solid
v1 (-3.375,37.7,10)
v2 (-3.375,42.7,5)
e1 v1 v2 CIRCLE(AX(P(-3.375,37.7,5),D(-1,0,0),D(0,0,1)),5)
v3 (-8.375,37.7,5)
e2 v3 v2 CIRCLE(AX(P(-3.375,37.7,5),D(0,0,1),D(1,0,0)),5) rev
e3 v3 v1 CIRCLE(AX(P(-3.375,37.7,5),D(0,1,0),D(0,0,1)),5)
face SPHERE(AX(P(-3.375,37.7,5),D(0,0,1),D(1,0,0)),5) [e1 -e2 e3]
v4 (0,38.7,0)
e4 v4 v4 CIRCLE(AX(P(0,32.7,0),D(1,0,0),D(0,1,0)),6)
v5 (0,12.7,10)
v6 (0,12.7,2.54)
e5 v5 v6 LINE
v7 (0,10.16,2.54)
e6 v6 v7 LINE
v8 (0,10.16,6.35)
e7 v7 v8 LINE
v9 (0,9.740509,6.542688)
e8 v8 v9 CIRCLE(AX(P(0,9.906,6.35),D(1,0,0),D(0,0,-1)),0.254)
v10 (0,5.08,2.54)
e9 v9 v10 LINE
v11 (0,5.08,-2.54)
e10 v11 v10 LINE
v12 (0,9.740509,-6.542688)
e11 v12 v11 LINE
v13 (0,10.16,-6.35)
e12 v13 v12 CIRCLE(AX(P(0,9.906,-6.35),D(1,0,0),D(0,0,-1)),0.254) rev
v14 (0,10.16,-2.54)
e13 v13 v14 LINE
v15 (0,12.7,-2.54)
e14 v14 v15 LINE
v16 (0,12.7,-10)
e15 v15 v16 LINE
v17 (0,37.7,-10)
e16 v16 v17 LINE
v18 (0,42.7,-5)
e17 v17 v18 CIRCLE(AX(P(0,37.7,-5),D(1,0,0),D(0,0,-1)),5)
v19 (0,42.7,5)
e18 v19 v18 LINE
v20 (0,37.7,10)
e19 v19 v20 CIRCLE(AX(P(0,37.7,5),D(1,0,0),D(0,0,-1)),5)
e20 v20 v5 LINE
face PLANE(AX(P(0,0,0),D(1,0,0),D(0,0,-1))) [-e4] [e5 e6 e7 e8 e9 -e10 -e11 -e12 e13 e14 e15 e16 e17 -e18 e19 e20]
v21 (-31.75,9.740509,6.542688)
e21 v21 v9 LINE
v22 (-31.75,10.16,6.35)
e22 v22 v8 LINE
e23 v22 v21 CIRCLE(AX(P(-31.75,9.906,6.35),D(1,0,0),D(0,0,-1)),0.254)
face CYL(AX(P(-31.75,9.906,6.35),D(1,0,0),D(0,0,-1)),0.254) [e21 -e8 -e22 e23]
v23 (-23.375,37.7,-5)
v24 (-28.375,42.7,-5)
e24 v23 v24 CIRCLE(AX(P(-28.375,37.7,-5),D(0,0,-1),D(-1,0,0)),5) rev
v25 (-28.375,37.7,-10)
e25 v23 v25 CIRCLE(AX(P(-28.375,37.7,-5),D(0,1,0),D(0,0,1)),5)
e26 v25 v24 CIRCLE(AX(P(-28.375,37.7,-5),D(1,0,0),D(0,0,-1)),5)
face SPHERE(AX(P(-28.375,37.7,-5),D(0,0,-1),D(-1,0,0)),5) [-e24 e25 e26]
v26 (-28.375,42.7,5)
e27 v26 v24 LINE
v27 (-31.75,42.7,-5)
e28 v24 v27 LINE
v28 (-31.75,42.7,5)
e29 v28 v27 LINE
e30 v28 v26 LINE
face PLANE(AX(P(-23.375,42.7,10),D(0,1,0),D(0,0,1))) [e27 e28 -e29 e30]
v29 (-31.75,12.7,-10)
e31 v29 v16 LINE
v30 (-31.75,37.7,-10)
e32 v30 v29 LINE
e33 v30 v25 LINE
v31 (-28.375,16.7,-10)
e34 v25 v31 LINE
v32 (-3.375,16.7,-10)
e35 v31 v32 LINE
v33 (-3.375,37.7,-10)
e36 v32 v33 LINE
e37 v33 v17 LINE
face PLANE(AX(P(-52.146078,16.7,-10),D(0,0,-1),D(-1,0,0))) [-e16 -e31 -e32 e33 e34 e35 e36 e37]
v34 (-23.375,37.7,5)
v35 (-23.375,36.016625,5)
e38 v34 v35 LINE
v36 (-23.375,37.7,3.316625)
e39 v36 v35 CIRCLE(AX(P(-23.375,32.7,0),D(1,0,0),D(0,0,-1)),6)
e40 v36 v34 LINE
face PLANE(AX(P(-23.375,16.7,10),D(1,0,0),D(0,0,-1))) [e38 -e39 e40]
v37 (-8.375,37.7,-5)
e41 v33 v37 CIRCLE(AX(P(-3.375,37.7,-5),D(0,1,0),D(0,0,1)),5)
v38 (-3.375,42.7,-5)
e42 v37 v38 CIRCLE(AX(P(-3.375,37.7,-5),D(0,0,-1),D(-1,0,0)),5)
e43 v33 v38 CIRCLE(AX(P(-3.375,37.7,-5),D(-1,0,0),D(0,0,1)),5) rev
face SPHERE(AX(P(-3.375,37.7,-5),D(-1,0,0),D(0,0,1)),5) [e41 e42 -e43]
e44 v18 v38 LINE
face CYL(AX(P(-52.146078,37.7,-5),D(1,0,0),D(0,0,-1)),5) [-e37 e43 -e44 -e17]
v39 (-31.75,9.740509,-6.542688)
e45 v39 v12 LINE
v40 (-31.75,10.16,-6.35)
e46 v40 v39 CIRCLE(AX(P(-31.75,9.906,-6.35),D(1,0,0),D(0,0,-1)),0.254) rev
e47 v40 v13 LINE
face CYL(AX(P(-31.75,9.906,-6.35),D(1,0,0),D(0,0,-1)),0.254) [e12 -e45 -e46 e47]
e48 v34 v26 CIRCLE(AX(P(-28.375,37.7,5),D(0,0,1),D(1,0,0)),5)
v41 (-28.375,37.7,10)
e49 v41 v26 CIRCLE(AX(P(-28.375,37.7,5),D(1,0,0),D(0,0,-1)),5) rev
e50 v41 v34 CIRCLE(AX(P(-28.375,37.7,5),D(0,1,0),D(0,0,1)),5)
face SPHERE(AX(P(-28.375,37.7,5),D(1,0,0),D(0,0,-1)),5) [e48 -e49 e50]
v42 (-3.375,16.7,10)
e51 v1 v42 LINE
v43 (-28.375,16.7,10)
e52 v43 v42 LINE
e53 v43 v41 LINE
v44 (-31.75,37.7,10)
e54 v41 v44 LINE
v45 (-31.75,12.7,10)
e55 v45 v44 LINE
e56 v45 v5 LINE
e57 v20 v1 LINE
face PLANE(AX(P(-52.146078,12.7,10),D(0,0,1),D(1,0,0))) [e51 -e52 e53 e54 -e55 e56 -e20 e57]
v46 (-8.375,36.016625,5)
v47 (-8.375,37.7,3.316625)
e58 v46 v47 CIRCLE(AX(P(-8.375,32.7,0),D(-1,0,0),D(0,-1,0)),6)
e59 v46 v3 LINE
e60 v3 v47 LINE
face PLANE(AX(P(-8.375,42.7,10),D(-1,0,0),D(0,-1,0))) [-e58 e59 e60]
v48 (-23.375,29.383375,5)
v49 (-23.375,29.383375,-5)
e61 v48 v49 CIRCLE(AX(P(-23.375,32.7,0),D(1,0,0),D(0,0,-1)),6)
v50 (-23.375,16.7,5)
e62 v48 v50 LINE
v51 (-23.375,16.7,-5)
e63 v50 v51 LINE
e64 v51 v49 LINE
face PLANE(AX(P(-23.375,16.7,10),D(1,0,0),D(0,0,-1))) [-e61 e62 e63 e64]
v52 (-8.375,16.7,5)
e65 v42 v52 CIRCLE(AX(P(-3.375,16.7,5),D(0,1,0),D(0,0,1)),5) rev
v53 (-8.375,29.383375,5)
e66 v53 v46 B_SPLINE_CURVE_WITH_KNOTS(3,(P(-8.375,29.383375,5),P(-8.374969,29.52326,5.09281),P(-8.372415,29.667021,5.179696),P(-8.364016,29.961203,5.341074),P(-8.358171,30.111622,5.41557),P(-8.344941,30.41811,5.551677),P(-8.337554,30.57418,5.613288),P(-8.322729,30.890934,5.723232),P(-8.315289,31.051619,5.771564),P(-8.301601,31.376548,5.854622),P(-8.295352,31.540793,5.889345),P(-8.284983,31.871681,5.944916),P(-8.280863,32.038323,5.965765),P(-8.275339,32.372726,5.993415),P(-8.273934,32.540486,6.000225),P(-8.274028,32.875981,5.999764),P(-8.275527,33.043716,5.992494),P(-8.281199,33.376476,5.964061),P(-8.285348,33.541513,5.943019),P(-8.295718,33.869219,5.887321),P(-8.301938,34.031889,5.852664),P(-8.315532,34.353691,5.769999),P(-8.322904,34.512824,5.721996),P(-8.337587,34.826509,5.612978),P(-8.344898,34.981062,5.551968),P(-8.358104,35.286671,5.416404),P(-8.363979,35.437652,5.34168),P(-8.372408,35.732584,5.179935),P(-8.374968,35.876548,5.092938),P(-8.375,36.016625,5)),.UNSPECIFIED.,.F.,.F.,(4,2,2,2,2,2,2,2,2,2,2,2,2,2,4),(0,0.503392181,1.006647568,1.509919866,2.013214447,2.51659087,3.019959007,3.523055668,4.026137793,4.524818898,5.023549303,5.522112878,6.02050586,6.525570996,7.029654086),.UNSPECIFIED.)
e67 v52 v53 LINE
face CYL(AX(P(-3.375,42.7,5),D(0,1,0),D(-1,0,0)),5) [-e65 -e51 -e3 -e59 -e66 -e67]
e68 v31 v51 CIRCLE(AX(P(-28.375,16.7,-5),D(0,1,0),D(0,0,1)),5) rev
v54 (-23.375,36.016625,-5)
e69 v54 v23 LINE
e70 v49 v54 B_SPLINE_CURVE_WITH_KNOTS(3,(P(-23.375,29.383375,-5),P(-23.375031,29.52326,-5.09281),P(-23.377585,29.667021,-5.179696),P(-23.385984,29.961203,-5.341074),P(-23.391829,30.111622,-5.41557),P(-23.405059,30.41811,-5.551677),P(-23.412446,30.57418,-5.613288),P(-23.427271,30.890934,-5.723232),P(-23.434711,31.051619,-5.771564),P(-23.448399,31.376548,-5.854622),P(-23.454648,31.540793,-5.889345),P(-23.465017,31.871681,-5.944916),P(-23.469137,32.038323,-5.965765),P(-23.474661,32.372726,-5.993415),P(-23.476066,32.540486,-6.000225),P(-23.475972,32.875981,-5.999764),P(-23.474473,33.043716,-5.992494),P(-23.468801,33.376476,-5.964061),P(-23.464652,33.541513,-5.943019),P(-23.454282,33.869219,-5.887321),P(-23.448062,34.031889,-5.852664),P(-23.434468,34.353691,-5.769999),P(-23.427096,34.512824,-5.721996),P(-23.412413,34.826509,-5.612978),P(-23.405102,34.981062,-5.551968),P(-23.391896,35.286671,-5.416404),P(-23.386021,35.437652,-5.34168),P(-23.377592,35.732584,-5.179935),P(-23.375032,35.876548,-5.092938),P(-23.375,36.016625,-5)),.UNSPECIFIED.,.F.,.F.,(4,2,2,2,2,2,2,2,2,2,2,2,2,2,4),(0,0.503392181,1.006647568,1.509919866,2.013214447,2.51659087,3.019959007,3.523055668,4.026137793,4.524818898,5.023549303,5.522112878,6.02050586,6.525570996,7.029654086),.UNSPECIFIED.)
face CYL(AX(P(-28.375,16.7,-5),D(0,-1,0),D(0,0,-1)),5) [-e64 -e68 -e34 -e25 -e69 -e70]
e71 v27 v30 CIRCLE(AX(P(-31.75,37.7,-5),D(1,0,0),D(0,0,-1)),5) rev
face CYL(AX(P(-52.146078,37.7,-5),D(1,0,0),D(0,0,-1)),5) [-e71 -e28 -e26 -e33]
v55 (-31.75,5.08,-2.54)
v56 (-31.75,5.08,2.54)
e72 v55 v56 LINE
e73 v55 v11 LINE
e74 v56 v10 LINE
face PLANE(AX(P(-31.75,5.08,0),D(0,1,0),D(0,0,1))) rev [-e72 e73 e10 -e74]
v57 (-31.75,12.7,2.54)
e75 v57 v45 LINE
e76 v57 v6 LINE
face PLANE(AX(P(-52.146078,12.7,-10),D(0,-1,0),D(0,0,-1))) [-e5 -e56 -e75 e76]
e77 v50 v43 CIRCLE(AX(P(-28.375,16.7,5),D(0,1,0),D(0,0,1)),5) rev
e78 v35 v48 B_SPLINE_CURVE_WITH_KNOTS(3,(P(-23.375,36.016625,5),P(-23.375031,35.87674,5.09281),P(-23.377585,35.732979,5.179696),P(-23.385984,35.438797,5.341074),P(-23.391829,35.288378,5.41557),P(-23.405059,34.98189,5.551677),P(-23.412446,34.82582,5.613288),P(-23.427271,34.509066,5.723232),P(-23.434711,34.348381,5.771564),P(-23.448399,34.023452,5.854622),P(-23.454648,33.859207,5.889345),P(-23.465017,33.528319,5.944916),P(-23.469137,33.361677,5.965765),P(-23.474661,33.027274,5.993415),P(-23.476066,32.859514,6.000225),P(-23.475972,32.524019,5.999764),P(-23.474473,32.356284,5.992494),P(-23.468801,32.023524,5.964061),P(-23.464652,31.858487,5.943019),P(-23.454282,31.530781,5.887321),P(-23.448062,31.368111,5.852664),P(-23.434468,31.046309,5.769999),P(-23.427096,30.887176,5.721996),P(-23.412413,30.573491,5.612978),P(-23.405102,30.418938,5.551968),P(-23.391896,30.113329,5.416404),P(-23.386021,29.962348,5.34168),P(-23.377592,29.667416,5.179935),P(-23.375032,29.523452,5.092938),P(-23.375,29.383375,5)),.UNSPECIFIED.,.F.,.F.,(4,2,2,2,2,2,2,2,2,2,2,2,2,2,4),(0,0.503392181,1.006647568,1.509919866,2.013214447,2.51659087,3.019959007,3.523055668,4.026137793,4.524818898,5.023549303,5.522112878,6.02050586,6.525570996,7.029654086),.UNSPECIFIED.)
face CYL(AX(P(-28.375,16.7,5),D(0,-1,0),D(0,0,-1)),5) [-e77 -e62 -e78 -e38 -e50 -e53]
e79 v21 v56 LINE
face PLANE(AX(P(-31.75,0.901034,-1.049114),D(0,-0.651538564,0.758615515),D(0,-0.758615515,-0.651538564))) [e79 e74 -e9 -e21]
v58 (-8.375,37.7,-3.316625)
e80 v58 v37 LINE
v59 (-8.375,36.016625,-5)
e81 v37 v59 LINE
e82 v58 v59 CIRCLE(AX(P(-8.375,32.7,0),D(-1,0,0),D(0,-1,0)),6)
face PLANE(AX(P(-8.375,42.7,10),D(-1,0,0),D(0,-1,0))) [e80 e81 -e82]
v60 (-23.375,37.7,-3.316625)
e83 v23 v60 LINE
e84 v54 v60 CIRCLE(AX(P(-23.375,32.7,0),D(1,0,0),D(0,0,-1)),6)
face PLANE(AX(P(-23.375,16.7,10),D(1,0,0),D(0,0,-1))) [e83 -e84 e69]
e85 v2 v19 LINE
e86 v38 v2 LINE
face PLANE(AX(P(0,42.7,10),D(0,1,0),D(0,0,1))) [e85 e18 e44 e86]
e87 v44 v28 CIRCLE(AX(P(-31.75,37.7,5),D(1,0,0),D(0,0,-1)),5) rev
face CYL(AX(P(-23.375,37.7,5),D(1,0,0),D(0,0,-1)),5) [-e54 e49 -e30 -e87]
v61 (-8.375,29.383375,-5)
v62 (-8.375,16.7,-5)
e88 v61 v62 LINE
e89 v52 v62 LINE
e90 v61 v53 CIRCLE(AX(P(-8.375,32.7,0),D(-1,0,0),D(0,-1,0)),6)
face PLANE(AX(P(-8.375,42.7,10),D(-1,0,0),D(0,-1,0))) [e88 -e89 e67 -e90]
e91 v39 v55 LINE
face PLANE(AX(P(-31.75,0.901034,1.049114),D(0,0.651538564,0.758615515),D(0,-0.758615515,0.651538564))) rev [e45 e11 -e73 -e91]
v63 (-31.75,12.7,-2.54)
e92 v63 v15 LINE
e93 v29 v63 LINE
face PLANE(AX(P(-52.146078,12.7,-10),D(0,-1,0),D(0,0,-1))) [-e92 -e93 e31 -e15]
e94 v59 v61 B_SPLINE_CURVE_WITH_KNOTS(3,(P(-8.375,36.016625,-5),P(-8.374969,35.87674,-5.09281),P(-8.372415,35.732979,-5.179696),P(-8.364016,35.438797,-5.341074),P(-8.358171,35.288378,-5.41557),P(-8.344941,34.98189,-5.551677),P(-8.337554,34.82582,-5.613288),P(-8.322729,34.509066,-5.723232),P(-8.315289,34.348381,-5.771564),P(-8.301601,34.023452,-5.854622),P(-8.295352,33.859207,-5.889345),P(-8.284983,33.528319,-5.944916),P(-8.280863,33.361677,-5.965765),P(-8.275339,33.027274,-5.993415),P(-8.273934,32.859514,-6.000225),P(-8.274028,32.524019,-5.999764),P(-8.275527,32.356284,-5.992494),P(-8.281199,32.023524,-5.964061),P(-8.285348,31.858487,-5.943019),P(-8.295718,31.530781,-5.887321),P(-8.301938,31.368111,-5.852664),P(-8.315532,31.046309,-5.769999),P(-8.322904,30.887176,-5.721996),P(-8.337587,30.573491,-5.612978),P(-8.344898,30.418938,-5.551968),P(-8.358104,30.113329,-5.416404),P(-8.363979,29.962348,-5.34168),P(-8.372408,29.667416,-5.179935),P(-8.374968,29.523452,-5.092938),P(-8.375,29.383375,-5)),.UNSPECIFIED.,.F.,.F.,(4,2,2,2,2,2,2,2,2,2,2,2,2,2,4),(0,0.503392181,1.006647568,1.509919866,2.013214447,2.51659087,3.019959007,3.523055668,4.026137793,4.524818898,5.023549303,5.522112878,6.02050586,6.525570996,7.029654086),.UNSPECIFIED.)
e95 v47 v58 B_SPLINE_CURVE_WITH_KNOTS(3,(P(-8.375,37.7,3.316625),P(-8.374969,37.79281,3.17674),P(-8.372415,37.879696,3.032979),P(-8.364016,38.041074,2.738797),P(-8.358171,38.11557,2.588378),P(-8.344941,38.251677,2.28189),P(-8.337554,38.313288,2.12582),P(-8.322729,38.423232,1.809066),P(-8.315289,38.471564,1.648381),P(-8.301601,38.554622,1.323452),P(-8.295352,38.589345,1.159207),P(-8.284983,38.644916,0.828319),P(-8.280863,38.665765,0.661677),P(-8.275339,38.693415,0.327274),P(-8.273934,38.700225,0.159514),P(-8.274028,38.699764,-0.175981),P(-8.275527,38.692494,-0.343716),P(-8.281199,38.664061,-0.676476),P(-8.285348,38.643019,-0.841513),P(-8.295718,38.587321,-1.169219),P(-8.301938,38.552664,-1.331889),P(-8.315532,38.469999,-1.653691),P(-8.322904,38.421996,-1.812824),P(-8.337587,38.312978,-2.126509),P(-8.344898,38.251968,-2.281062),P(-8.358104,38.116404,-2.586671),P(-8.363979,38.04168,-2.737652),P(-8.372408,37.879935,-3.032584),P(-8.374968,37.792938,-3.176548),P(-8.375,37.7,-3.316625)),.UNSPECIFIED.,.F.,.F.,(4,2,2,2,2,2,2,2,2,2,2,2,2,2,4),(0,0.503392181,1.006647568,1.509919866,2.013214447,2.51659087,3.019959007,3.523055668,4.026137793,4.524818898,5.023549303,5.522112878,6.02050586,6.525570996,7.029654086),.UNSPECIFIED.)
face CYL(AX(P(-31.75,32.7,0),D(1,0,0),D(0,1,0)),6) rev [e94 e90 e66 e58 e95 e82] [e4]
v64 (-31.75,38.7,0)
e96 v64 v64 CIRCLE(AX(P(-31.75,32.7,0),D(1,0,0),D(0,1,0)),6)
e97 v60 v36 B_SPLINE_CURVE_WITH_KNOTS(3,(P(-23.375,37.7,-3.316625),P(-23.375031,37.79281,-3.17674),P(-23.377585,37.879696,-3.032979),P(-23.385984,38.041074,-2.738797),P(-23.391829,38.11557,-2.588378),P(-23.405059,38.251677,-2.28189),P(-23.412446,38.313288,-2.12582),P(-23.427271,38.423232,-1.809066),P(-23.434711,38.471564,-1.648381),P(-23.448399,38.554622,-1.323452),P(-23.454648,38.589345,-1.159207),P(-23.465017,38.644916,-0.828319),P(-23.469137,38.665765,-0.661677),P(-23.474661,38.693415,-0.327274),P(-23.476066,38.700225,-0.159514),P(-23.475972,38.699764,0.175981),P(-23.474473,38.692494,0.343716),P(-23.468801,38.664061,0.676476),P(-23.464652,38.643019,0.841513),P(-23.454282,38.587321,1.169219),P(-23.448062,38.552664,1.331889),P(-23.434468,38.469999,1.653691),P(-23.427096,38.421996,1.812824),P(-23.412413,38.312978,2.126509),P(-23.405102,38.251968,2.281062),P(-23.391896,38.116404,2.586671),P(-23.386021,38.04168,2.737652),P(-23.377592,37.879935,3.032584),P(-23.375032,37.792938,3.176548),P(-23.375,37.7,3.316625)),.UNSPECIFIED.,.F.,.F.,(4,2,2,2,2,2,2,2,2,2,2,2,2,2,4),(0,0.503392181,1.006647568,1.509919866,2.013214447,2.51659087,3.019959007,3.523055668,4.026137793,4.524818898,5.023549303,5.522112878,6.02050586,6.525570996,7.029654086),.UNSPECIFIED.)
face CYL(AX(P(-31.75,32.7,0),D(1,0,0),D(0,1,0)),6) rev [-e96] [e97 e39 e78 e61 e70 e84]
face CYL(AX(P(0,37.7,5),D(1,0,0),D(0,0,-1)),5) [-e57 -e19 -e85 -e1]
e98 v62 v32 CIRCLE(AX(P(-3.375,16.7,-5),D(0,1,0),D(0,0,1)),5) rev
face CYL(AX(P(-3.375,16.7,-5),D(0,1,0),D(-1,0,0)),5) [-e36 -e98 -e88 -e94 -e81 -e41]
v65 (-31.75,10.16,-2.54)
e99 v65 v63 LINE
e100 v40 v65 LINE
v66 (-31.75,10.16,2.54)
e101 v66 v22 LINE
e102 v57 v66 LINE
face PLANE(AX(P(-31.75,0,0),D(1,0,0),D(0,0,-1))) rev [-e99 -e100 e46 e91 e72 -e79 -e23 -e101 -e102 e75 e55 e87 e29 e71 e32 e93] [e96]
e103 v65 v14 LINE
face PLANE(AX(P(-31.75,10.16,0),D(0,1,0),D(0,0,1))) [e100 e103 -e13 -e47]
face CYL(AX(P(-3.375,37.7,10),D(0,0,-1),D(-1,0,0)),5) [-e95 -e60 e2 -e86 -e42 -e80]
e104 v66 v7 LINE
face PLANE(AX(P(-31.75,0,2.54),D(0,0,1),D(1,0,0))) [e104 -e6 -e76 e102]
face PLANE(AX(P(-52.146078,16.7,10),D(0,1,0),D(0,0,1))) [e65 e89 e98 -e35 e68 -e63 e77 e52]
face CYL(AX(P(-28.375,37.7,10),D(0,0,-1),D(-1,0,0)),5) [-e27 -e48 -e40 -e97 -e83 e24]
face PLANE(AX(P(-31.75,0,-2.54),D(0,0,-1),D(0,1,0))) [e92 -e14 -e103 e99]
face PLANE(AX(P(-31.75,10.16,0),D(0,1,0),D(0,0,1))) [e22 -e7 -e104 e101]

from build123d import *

# Parameters (mm, degrees)
SKETCH10_W              = 2.54
SKETCH10_H              = 5.08
SKETCH10_W_2            = 5.08
SKETCH10_H_2            = 2.54
BOSS_EXTRUDE3_DEPTH     = 31.75
SKETCH11_W              = 20
SKETCH11_H              = 4
BOSS_EXTRUDE4_DEPTH     = 31.75
CUT_EXTRUDE1_DEPTH      = 39.055781427
SKETCH13_W              = 8.375
SKETCH13_H              = 26
BOSS_EXTRUDE5_DEPTH     = 20
CUT_EXTRUDE2_DEPTH      = 50.695881369
CUT_EXTRUDE2_DEPTH_BACK = 50.695881369
SKETCH16_R              = 6
FILLET1_R               = 5


with BuildPart() as part:
    # Sketch10 → Boss-Extrude3 (new body)
    with BuildSketch(Plane(origin=(0, 0, 0), x_dir=(0, 0, -1), z_dir=(1, 0, 0))):
        with Locations((-11.43, 0)):
            Rectangle(SKETCH10_W, SKETCH10_H)
        with BuildLine():
            Line((-5.08, 2.54), (-9.740509205, 6.542688341))
            ThreePointArc((-9.740509205, 6.542688341), (-10.012022021, 6.580814495), (-10.16, 6.35))
            Line((-10.16, 6.35), (-10.16, -6.35))
            ThreePointArc((-10.16, -6.35), (-10.012022021, -6.580814495), (-9.740509205, -6.542688341))
            Line((-9.740509205, -6.542688341), (-5.08, -2.54))
            Line((-5.08, -2.54), (-5.08, 2.54))
        make_face()
        with BuildLine():
            Line((6.35, 10.16), (-6.35, 10.16))
            ThreePointArc((-6.35, 10.16), (-6.580814495, 10.012022021), (-6.542688341, 9.740509205))
            Line((-6.542688341, 9.740509205), (-2.54, 5.08))
            Line((-2.54, 5.08), (2.54, 5.08))
            Line((2.54, 5.08), (6.542688341, 9.740509205))
            ThreePointArc((6.542688341, 9.740509205), (6.580814495, 10.012022021), (6.35, 10.16))
        make_face()
        with Locations((0, 11.43)):
            Rectangle(SKETCH10_W_2, SKETCH10_H_2)
        with BuildLine():
            ThreePointArc((6.542688341, -9.740509205), (6.580814495, -10.012022021), (6.35, -10.16))
            Line((6.35, -10.16), (-6.35, -10.16))
            ThreePointArc((-6.35, -10.16), (-6.580814495, -10.012022021), (-6.542688341, -9.740509205))
            Line((-6.542688341, -9.740509205), (-2.54, -5.08))
            Line((-2.54, -5.08), (2.54, -5.08))
            Line((2.54, -5.08), (6.542688341, -9.740509205))
        make_face()
        with Locations((0, -11.43)):
            Rectangle(SKETCH10_W_2, SKETCH10_H_2)
        with BuildLine():
            Line((5.08, 2.54), (5.08, -2.54))
            Line((5.08, -2.54), (9.740509205, -6.542688341))
            ThreePointArc((9.740509205, -6.542688341), (10.012022021, -6.580814495), (10.16, -6.35))
            Line((10.16, -6.35), (10.16, -2.54))
            Line((10.16, -2.54), (10.16, 2.54))
            Line((10.16, 2.54), (10.16, 6.35))
            ThreePointArc((10.16, 6.35), (10.012022021, 6.580814495), (9.740509205, 6.542688341))
            Line((9.740509205, 6.542688341), (5.08, 2.54))
        make_face()
        with Locations((11.43, 0)):
            Rectangle(SKETCH10_W, SKETCH10_H)
    extrude(amount=-BOSS_EXTRUDE3_DEPTH)

    # Sketch11 → Boss-Extrude4 (add)
    with BuildSketch(Plane(origin=(0, 0, 0), x_dir=(0, 0, -1), z_dir=(1, 0, 0))):
        with Locations((0, 14.7)):
            Rectangle(SKETCH11_W, SKETCH11_H)
    extrude(amount=-BOSS_EXTRUDE4_DEPTH)

    # Sketch12 → Cut-Extrude1 (cut, through all)
    with BuildSketch(Plane.ZY.offset(31.75)):
        Polygon((0, 0), (-15.483602638, 16.020997712), (-15.483602638, -14.964233499), (16.01610749, -14.964233499), (16.01610749, 15.47887645), align=None)
    extrude(amount=-CUT_EXTRUDE1_DEPTH, mode=Mode.SUBTRACT)

    # Sketch13 → Boss-Extrude5 (add, through all)
    with BuildSketch(Plane(origin=(0, 0, -10), x_dir=(-1, 0, 0), z_dir=(0, 0, -1))):
        with Locations((4.1875, 29.7)):
            Rectangle(SKETCH13_W, SKETCH13_H)
        with Locations((27.5625, 29.7)):
            Rectangle(SKETCH13_W, SKETCH13_H)
    extrude(amount=-BOSS_EXTRUDE5_DEPTH)

    # Sketch16 → Cut-Extrude2 (cut, two sides: drawn at the far end of the back side and taken through both)
    with BuildSketch(Plane(origin=(-23.375, 0, 0), x_dir=(0, 0, -1), z_dir=(1, 0, 0)).offset(-CUT_EXTRUDE2_DEPTH_BACK)):
        with Locations(Location((0, 32.7, 0), (0, 0, 90))):
            Circle(SKETCH16_R)
    extrude(amount=CUT_EXTRUDE2_DEPTH + CUT_EXTRUDE2_DEPTH_BACK, mode=Mode.SUBTRACT)

    # Fillet1
    # the kernel refuses this fillet: 5 mm, written as the material it takes off along each edge
    with BuildSketch(Plane(origin=(-3.375, 37.7, 5), x_dir=(0, 1, 0), z_dir=(-1, 0, 0))) as fillet1_piece_1_section:
        Polygon((0, 0), (FILLET1_R * 1.02, 0), (FILLET1_R * 1.02, -FILLET1_R * 1.02), (0, -FILLET1_R * 1.02), align=None)
    fillet1_piece_1 = extrude(amount=FILLET1_R * 1.02, mode=Mode.PRIVATE)
    fillet1_piece_1 = fillet1_piece_1 - Plane(origin=(-3.375, 37.7, 5), x_dir=(0, -0.7071067811865475, -0.7071067811865475), z_dir=(-1, 0, 0)) * Sphere(FILLET1_R, mode=Mode.PRIVATE)
    add(fillet1_piece_1, mode=Mode.SUBTRACT)
    with BuildSketch(Plane(origin=(-3.375, 37.7, -5), x_dir=(0, 0, -1), z_dir=(-1, 0, 0))) as fillet1_piece_2_section:
        Polygon((0, 0), (FILLET1_R * 1.02, 0), (FILLET1_R * 1.02, -FILLET1_R * 1.02), (0, -FILLET1_R * 1.02), align=None)
    fillet1_piece_2 = extrude(amount=FILLET1_R * 1.02, mode=Mode.PRIVATE)
    fillet1_piece_2 = fillet1_piece_2 - Plane(origin=(-3.375, 37.7, -5), x_dir=(0, -0.7071067811865475, 0.7071067811865475), z_dir=(-1, 0, 0)) * Sphere(FILLET1_R, mode=Mode.PRIVATE)
    add(fillet1_piece_2, mode=Mode.SUBTRACT)
    with BuildSketch(Plane(origin=(-28.375, 37.7, 5), x_dir=(1, 0, 0), z_dir=(0, 1, 0))) as fillet1_piece_3_section:
        Polygon((0, 0), (FILLET1_R * 1.02, 0), (FILLET1_R * 1.02, -FILLET1_R * 1.02), (0, -FILLET1_R * 1.02), align=None)
    fillet1_piece_3 = extrude(amount=FILLET1_R * 1.02, mode=Mode.PRIVATE)
    fillet1_piece_3 = fillet1_piece_3 - Plane(origin=(-28.375, 37.7, 5), x_dir=(-0.7071067811865475, 0, -0.7071067811865475), z_dir=(0, 1, 0)) * Sphere(FILLET1_R, mode=Mode.PRIVATE)
    add(fillet1_piece_3, mode=Mode.SUBTRACT)
    with BuildSketch(Plane(origin=(-28.375, 37.7, -5), x_dir=(1, 0, 0), z_dir=(0, 1, 0))) as fillet1_piece_4_section:
        Polygon((0, 0), (FILLET1_R * 1.02, 0), (FILLET1_R * 1.02, FILLET1_R * 1.02), (0, FILLET1_R * 1.02), align=None)
    fillet1_piece_4 = extrude(amount=FILLET1_R * 1.02, mode=Mode.PRIVATE)
    fillet1_piece_4 = fillet1_piece_4 - Plane(origin=(-28.375, 37.7, -5), x_dir=(-0.7071067811865475, 0, 0.7071067811865475), z_dir=(0, 1, 0)) * Sphere(FILLET1_R, mode=Mode.PRIVATE)
    add(fillet1_piece_4, mode=Mode.SUBTRACT)
    with BuildSketch(Plane(origin=(12.5, 42.7, 10), x_dir=(0, 0, -1), z_dir=(-1, 0, 0)), Plane(origin=(12.5, 42.7, -10), x_dir=(0, -1, 0), z_dir=(-1, 0, 0)), Plane(origin=(-28.375, 42.7, -10), x_dir=(0, -1, 0), z_dir=(-1, 0, 0))) as fillet1_piece_5:
        with BuildLine():
            CenterArc((FILLET1_R, FILLET1_R), FILLET1_R, 180, 90)
            Line((0, FILLET1_R), (0, 0))
            Line((0, 0), (FILLET1_R, 0))
        make_face()
    extrude(amount=15.875, mode=Mode.SUBTRACT)
    with BuildSketch(Plane(origin=(-8.375, 37.7, 10), x_dir=(1, 0, 0), z_dir=(0, -1, 0)), Plane(origin=(-23.375, 16.7, 10), x_dir=(-1, 0, 0), z_dir=(0, 1, 0))) as fillet1_piece_6:
        with BuildLine():
            CenterArc((FILLET1_R, -FILLET1_R), FILLET1_R, 90, 90)
            Line((0, -FILLET1_R), (0, 0))
            Line((0, 0), (FILLET1_R, 0))
        make_face()
    extrude(amount=21, mode=Mode.SUBTRACT)
    with BuildSketch(Plane(origin=(-8.375, 42.7, -5), x_dir=(1, 0, 0), z_dir=(0, 0, 1))) as fillet1_piece_7:
        with BuildLine():
            CenterArc((FILLET1_R, -FILLET1_R), FILLET1_R, 90, 90)
            Line((0, -FILLET1_R), (0, 0))
            Line((0, 0), (FILLET1_R, 0))
        make_face()
    extrude(amount=10, mode=Mode.SUBTRACT)
    with BuildSketch(Plane(origin=(-8.375, 37.7, -10), x_dir=(1, 0, 0), z_dir=(0, -1, 0)), Plane(origin=(-23.375, 16.7, -10), x_dir=(-1, 0, 0), z_dir=(0, 1, 0))) as fillet1_piece_8:
        with BuildLine():
            CenterArc((FILLET1_R, FILLET1_R), FILLET1_R, 180, 90)
            Line((0, FILLET1_R), (0, 0))
            Line((0, 0), (FILLET1_R, 0))
        make_face()
    extrude(amount=21, mode=Mode.SUBTRACT)
    with BuildSketch(Plane(origin=(-28.375, 42.7, 10), x_dir=(0, -1, 0), z_dir=(-1, 0, 0))) as fillet1_piece_9:
        with BuildLine():
            CenterArc((FILLET1_R, -FILLET1_R), FILLET1_R, 90, 90)
            Line((0, -FILLET1_R), (0, 0))
            Line((0, 0), (FILLET1_R, 0))
        make_face()
    extrude(amount=15.875, mode=Mode.SUBTRACT)
    with BuildSketch(Plane(origin=(-23.375, 42.7, -5), x_dir=(-1, 0, 0), z_dir=(0, 0, 1))) as fillet1_piece_10:
        with BuildLine():
            CenterArc((FILLET1_R, FILLET1_R), FILLET1_R, 180, 90)
            Line((0, FILLET1_R), (0, 0))
            Line((0, 0), (FILLET1_R, 0))
        make_face()
    extrude(amount=10, mode=Mode.SUBTRACT)


solid = part.part
